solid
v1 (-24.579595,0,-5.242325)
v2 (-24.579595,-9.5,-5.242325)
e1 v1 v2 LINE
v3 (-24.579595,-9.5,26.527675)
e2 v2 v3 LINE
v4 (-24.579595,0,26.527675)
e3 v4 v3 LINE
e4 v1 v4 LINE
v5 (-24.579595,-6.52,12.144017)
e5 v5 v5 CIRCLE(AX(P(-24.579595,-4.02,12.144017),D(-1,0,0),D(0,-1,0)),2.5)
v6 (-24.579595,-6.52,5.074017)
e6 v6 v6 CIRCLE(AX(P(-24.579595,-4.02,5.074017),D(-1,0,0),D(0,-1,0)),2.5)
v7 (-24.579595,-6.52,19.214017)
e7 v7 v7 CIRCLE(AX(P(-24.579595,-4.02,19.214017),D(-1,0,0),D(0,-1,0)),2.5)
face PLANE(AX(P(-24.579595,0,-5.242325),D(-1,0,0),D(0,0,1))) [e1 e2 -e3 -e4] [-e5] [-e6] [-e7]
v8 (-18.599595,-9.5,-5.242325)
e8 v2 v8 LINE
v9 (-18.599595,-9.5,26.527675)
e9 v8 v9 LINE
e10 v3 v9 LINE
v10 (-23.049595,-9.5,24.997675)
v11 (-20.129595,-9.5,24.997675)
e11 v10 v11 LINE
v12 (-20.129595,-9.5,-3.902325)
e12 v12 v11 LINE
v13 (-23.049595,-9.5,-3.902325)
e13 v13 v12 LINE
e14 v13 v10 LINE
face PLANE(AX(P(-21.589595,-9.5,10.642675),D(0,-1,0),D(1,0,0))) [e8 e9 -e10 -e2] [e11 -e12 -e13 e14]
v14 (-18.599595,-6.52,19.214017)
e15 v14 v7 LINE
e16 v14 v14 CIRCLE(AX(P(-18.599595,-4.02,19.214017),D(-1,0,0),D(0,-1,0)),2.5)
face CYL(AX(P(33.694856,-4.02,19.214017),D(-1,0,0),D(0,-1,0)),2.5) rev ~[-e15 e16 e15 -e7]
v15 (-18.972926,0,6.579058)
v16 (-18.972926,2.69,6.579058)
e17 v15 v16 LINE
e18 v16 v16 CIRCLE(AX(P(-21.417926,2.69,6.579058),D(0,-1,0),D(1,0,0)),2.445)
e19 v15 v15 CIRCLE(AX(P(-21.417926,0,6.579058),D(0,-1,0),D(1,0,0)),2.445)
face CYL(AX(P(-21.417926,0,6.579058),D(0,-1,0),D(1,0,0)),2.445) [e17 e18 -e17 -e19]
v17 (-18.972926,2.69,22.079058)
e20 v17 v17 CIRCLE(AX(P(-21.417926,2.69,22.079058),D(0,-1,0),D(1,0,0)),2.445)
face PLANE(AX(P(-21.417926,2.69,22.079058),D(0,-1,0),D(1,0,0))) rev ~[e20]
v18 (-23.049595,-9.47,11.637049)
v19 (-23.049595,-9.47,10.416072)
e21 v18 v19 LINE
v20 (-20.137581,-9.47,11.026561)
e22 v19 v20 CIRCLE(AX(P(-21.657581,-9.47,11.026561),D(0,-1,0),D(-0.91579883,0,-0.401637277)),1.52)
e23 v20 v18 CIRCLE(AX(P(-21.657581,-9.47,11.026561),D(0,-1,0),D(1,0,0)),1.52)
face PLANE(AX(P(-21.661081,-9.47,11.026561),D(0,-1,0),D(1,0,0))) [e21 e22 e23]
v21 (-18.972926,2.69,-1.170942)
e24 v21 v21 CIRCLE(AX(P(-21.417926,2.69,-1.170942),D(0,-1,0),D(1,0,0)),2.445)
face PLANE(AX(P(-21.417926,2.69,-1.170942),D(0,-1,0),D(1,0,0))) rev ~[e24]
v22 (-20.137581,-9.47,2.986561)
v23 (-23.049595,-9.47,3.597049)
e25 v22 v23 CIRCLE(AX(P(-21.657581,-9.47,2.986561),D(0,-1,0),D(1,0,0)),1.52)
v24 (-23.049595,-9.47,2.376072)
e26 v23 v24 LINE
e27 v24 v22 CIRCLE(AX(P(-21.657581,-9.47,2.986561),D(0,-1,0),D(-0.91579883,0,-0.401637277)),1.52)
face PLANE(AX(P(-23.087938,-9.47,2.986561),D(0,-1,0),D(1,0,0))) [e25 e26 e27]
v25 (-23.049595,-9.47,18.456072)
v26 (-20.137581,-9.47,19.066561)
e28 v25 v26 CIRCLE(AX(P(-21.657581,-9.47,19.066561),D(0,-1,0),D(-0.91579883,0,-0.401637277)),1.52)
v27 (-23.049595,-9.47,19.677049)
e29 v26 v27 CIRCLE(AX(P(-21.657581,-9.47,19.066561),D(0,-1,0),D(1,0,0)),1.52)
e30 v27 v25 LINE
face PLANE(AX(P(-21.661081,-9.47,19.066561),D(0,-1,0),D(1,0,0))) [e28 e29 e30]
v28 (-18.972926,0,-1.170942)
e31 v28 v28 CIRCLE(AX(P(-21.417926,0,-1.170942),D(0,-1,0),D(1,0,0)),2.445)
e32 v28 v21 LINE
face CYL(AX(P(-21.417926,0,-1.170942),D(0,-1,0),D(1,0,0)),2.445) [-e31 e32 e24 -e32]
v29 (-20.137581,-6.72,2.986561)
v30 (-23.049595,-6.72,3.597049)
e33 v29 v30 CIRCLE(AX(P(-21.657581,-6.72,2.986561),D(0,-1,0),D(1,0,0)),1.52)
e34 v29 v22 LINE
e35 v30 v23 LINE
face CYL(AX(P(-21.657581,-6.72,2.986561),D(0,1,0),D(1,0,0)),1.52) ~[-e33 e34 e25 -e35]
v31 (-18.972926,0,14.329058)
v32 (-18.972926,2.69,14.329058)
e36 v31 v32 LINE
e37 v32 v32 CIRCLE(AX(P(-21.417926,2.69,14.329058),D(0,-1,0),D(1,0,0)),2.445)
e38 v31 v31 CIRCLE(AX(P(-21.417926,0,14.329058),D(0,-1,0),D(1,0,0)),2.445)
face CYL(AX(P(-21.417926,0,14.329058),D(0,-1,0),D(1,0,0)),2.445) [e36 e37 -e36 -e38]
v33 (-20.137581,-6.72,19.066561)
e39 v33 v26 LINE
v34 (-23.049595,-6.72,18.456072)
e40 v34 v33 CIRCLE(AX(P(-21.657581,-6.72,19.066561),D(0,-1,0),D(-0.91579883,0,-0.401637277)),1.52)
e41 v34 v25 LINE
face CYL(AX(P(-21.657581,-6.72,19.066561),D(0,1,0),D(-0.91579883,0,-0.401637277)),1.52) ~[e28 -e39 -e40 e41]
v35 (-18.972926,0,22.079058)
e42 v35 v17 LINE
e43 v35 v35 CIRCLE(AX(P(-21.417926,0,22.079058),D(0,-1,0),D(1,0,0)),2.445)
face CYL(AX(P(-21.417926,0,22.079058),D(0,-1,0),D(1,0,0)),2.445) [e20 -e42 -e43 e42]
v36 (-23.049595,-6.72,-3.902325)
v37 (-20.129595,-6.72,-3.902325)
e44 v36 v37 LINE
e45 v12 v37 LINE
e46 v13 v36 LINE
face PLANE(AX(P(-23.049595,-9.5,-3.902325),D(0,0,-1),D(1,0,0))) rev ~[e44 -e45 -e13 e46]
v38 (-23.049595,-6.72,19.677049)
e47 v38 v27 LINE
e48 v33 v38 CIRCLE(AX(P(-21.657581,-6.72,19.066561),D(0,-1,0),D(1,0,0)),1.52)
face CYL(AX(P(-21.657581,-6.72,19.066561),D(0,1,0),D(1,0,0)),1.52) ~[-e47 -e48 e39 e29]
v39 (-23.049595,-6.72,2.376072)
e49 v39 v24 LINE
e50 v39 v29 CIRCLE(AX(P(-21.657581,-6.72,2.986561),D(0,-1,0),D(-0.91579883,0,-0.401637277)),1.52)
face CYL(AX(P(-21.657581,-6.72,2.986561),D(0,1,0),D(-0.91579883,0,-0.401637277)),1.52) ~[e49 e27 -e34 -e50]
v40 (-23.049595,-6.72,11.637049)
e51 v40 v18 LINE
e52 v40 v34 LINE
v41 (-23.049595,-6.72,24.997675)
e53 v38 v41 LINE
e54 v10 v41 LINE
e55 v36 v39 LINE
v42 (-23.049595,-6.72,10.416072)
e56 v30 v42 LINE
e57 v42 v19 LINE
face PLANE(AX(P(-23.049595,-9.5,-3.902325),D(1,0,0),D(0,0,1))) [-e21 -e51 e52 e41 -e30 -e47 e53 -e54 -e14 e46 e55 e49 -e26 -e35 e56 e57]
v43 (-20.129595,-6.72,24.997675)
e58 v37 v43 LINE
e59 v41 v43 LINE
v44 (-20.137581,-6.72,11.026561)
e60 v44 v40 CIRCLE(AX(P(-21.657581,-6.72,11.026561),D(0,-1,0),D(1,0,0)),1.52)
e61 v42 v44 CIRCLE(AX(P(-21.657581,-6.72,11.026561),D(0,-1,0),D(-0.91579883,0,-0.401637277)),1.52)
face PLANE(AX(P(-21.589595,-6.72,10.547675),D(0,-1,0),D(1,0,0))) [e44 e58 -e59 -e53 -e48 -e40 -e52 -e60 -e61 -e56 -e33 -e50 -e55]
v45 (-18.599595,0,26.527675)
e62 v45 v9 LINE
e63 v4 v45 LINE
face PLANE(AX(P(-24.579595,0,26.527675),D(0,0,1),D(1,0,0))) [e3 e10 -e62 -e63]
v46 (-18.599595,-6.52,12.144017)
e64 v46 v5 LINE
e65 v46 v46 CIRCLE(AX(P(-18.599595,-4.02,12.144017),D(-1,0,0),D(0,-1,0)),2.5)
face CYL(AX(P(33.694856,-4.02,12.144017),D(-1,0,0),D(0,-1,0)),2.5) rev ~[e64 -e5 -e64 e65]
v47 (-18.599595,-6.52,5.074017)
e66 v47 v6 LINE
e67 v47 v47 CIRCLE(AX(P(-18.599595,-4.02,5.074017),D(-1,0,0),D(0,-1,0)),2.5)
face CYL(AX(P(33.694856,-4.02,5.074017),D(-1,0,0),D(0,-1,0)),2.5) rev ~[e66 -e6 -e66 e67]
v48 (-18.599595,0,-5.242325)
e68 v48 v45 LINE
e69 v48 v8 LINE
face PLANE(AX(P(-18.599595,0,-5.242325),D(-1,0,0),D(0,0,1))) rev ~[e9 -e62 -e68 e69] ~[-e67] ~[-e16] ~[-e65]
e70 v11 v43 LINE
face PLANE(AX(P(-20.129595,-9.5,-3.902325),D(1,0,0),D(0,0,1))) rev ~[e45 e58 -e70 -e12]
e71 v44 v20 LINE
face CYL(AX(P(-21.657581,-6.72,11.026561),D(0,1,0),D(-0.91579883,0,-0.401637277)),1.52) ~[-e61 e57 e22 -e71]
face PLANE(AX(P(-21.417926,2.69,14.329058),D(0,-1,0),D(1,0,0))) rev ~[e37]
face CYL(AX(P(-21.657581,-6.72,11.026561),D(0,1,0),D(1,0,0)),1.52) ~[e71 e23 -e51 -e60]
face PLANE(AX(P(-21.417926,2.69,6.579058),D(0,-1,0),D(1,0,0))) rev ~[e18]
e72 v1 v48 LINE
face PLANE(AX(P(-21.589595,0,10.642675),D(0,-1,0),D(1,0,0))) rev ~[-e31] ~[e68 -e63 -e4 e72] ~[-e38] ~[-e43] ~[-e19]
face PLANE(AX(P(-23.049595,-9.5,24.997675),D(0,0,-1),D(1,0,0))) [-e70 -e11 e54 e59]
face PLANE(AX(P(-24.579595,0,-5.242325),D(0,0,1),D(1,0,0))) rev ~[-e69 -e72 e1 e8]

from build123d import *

# Parameters (mm, degrees)
F0_W     = 5.98
F0_H     = 31.77
F1_DEPTH = 9.5
F3_D     = 5
F4_R     = 2.445
F5_DEPTH = 2.69
F6_W     = 2.92
F6_H     = 28.9
F7_DEPTH = 2.78
F9_DEPTH = 2.75


with BuildPart() as f1:
    # F0 (on Front) → F1 (new body)
    with BuildSketch(Plane.XZ):
        with Locations((-21.5895947321, 10.6426752984)):
            Rectangle(F0_W, F0_H)
    extrude(amount=F1_DEPTH)

    # F3 (through all)
    with Locations(Plane.YZ):
        with Locations((-4.02, 19.2140168432), (-4.02, 12.1440168432), (-4.02, 5.0740168432)):
            Hole(F3_D / 2)

    # F4 (on Front) → F5 (join)
    with BuildSketch(Plane.XZ):
        with Locations((-21.4179256038, 22.0790577062)):
            Circle(F4_R)
        with Locations((-21.4179256038, 14.3290577062)):
            Circle(F4_R)
        with Locations((-21.4179256038, 6.5790577062)):
            Circle(F4_R)
        with Locations((-21.4179256038, -1.1709422938)):
            Circle(F4_R)
    extrude(amount=-F5_DEPTH)

    # F6 (on face) → F7 (cut)
    with BuildSketch(Plane.XZ.offset(9.5)):
        with Locations((-21.5895947321, 10.5476752984)):
            Rectangle(F6_W, F6_H)
    extrude(amount=-F7_DEPTH, mode=Mode.SUBTRACT)

    # F8 (on face) → F9 (join)
    with BuildSketch(Plane.XZ.offset(6.72)):
        with BuildLine():
            ThreePointArc((-23.0495947321, 18.4560718795), (-21.345700419, 17.5789010333), (-20.1375805098, 19.0665605403))
            ThreePointArc((-20.1375805098, 19.0665605403), (-21.345700419, 20.5542200474), (-23.0495947321, 19.6770492011))
            Line((-23.0495947321, 19.6770492011), (-23.0495947321, 18.4560718795))
        make_face()
        with BuildLine():
            ThreePointArc((-20.1375805098, 11.0265605403), (-21.345700419, 12.5142200474), (-23.0495947321, 11.6370492011))
            Line((-23.0495947321, 11.6370492011), (-23.0495947321, 10.4160718795))
            ThreePointArc((-23.0495947321, 10.4160718795), (-21.345700419, 9.5389010333), (-20.1375805098, 11.0265605403))
        make_face()
        with BuildLine():
            Line((-23.0495947321, 2.3760718795), (-23.0495947321, 3.5970492011))
            ThreePointArc((-23.0495947321, 3.5970492011), (-23.1775805098, 2.9865605403), (-23.0495947321, 2.3760718795))
        make_face()
        with BuildLine():
            ThreePointArc((-20.1375805098, 2.9865605403), (-21.345700419, 4.4742200474), (-23.0495947321, 3.5970492011))
            Line((-23.0495947321, 3.5970492011), (-23.0495947321, 2.3760718795))
            ThreePointArc((-23.0495947321, 2.3760718795), (-21.345700419, 1.4989010333), (-20.1375805098, 2.9865605403))
        make_face()
    extrude(amount=F9_DEPTH)


solid = f1.part
